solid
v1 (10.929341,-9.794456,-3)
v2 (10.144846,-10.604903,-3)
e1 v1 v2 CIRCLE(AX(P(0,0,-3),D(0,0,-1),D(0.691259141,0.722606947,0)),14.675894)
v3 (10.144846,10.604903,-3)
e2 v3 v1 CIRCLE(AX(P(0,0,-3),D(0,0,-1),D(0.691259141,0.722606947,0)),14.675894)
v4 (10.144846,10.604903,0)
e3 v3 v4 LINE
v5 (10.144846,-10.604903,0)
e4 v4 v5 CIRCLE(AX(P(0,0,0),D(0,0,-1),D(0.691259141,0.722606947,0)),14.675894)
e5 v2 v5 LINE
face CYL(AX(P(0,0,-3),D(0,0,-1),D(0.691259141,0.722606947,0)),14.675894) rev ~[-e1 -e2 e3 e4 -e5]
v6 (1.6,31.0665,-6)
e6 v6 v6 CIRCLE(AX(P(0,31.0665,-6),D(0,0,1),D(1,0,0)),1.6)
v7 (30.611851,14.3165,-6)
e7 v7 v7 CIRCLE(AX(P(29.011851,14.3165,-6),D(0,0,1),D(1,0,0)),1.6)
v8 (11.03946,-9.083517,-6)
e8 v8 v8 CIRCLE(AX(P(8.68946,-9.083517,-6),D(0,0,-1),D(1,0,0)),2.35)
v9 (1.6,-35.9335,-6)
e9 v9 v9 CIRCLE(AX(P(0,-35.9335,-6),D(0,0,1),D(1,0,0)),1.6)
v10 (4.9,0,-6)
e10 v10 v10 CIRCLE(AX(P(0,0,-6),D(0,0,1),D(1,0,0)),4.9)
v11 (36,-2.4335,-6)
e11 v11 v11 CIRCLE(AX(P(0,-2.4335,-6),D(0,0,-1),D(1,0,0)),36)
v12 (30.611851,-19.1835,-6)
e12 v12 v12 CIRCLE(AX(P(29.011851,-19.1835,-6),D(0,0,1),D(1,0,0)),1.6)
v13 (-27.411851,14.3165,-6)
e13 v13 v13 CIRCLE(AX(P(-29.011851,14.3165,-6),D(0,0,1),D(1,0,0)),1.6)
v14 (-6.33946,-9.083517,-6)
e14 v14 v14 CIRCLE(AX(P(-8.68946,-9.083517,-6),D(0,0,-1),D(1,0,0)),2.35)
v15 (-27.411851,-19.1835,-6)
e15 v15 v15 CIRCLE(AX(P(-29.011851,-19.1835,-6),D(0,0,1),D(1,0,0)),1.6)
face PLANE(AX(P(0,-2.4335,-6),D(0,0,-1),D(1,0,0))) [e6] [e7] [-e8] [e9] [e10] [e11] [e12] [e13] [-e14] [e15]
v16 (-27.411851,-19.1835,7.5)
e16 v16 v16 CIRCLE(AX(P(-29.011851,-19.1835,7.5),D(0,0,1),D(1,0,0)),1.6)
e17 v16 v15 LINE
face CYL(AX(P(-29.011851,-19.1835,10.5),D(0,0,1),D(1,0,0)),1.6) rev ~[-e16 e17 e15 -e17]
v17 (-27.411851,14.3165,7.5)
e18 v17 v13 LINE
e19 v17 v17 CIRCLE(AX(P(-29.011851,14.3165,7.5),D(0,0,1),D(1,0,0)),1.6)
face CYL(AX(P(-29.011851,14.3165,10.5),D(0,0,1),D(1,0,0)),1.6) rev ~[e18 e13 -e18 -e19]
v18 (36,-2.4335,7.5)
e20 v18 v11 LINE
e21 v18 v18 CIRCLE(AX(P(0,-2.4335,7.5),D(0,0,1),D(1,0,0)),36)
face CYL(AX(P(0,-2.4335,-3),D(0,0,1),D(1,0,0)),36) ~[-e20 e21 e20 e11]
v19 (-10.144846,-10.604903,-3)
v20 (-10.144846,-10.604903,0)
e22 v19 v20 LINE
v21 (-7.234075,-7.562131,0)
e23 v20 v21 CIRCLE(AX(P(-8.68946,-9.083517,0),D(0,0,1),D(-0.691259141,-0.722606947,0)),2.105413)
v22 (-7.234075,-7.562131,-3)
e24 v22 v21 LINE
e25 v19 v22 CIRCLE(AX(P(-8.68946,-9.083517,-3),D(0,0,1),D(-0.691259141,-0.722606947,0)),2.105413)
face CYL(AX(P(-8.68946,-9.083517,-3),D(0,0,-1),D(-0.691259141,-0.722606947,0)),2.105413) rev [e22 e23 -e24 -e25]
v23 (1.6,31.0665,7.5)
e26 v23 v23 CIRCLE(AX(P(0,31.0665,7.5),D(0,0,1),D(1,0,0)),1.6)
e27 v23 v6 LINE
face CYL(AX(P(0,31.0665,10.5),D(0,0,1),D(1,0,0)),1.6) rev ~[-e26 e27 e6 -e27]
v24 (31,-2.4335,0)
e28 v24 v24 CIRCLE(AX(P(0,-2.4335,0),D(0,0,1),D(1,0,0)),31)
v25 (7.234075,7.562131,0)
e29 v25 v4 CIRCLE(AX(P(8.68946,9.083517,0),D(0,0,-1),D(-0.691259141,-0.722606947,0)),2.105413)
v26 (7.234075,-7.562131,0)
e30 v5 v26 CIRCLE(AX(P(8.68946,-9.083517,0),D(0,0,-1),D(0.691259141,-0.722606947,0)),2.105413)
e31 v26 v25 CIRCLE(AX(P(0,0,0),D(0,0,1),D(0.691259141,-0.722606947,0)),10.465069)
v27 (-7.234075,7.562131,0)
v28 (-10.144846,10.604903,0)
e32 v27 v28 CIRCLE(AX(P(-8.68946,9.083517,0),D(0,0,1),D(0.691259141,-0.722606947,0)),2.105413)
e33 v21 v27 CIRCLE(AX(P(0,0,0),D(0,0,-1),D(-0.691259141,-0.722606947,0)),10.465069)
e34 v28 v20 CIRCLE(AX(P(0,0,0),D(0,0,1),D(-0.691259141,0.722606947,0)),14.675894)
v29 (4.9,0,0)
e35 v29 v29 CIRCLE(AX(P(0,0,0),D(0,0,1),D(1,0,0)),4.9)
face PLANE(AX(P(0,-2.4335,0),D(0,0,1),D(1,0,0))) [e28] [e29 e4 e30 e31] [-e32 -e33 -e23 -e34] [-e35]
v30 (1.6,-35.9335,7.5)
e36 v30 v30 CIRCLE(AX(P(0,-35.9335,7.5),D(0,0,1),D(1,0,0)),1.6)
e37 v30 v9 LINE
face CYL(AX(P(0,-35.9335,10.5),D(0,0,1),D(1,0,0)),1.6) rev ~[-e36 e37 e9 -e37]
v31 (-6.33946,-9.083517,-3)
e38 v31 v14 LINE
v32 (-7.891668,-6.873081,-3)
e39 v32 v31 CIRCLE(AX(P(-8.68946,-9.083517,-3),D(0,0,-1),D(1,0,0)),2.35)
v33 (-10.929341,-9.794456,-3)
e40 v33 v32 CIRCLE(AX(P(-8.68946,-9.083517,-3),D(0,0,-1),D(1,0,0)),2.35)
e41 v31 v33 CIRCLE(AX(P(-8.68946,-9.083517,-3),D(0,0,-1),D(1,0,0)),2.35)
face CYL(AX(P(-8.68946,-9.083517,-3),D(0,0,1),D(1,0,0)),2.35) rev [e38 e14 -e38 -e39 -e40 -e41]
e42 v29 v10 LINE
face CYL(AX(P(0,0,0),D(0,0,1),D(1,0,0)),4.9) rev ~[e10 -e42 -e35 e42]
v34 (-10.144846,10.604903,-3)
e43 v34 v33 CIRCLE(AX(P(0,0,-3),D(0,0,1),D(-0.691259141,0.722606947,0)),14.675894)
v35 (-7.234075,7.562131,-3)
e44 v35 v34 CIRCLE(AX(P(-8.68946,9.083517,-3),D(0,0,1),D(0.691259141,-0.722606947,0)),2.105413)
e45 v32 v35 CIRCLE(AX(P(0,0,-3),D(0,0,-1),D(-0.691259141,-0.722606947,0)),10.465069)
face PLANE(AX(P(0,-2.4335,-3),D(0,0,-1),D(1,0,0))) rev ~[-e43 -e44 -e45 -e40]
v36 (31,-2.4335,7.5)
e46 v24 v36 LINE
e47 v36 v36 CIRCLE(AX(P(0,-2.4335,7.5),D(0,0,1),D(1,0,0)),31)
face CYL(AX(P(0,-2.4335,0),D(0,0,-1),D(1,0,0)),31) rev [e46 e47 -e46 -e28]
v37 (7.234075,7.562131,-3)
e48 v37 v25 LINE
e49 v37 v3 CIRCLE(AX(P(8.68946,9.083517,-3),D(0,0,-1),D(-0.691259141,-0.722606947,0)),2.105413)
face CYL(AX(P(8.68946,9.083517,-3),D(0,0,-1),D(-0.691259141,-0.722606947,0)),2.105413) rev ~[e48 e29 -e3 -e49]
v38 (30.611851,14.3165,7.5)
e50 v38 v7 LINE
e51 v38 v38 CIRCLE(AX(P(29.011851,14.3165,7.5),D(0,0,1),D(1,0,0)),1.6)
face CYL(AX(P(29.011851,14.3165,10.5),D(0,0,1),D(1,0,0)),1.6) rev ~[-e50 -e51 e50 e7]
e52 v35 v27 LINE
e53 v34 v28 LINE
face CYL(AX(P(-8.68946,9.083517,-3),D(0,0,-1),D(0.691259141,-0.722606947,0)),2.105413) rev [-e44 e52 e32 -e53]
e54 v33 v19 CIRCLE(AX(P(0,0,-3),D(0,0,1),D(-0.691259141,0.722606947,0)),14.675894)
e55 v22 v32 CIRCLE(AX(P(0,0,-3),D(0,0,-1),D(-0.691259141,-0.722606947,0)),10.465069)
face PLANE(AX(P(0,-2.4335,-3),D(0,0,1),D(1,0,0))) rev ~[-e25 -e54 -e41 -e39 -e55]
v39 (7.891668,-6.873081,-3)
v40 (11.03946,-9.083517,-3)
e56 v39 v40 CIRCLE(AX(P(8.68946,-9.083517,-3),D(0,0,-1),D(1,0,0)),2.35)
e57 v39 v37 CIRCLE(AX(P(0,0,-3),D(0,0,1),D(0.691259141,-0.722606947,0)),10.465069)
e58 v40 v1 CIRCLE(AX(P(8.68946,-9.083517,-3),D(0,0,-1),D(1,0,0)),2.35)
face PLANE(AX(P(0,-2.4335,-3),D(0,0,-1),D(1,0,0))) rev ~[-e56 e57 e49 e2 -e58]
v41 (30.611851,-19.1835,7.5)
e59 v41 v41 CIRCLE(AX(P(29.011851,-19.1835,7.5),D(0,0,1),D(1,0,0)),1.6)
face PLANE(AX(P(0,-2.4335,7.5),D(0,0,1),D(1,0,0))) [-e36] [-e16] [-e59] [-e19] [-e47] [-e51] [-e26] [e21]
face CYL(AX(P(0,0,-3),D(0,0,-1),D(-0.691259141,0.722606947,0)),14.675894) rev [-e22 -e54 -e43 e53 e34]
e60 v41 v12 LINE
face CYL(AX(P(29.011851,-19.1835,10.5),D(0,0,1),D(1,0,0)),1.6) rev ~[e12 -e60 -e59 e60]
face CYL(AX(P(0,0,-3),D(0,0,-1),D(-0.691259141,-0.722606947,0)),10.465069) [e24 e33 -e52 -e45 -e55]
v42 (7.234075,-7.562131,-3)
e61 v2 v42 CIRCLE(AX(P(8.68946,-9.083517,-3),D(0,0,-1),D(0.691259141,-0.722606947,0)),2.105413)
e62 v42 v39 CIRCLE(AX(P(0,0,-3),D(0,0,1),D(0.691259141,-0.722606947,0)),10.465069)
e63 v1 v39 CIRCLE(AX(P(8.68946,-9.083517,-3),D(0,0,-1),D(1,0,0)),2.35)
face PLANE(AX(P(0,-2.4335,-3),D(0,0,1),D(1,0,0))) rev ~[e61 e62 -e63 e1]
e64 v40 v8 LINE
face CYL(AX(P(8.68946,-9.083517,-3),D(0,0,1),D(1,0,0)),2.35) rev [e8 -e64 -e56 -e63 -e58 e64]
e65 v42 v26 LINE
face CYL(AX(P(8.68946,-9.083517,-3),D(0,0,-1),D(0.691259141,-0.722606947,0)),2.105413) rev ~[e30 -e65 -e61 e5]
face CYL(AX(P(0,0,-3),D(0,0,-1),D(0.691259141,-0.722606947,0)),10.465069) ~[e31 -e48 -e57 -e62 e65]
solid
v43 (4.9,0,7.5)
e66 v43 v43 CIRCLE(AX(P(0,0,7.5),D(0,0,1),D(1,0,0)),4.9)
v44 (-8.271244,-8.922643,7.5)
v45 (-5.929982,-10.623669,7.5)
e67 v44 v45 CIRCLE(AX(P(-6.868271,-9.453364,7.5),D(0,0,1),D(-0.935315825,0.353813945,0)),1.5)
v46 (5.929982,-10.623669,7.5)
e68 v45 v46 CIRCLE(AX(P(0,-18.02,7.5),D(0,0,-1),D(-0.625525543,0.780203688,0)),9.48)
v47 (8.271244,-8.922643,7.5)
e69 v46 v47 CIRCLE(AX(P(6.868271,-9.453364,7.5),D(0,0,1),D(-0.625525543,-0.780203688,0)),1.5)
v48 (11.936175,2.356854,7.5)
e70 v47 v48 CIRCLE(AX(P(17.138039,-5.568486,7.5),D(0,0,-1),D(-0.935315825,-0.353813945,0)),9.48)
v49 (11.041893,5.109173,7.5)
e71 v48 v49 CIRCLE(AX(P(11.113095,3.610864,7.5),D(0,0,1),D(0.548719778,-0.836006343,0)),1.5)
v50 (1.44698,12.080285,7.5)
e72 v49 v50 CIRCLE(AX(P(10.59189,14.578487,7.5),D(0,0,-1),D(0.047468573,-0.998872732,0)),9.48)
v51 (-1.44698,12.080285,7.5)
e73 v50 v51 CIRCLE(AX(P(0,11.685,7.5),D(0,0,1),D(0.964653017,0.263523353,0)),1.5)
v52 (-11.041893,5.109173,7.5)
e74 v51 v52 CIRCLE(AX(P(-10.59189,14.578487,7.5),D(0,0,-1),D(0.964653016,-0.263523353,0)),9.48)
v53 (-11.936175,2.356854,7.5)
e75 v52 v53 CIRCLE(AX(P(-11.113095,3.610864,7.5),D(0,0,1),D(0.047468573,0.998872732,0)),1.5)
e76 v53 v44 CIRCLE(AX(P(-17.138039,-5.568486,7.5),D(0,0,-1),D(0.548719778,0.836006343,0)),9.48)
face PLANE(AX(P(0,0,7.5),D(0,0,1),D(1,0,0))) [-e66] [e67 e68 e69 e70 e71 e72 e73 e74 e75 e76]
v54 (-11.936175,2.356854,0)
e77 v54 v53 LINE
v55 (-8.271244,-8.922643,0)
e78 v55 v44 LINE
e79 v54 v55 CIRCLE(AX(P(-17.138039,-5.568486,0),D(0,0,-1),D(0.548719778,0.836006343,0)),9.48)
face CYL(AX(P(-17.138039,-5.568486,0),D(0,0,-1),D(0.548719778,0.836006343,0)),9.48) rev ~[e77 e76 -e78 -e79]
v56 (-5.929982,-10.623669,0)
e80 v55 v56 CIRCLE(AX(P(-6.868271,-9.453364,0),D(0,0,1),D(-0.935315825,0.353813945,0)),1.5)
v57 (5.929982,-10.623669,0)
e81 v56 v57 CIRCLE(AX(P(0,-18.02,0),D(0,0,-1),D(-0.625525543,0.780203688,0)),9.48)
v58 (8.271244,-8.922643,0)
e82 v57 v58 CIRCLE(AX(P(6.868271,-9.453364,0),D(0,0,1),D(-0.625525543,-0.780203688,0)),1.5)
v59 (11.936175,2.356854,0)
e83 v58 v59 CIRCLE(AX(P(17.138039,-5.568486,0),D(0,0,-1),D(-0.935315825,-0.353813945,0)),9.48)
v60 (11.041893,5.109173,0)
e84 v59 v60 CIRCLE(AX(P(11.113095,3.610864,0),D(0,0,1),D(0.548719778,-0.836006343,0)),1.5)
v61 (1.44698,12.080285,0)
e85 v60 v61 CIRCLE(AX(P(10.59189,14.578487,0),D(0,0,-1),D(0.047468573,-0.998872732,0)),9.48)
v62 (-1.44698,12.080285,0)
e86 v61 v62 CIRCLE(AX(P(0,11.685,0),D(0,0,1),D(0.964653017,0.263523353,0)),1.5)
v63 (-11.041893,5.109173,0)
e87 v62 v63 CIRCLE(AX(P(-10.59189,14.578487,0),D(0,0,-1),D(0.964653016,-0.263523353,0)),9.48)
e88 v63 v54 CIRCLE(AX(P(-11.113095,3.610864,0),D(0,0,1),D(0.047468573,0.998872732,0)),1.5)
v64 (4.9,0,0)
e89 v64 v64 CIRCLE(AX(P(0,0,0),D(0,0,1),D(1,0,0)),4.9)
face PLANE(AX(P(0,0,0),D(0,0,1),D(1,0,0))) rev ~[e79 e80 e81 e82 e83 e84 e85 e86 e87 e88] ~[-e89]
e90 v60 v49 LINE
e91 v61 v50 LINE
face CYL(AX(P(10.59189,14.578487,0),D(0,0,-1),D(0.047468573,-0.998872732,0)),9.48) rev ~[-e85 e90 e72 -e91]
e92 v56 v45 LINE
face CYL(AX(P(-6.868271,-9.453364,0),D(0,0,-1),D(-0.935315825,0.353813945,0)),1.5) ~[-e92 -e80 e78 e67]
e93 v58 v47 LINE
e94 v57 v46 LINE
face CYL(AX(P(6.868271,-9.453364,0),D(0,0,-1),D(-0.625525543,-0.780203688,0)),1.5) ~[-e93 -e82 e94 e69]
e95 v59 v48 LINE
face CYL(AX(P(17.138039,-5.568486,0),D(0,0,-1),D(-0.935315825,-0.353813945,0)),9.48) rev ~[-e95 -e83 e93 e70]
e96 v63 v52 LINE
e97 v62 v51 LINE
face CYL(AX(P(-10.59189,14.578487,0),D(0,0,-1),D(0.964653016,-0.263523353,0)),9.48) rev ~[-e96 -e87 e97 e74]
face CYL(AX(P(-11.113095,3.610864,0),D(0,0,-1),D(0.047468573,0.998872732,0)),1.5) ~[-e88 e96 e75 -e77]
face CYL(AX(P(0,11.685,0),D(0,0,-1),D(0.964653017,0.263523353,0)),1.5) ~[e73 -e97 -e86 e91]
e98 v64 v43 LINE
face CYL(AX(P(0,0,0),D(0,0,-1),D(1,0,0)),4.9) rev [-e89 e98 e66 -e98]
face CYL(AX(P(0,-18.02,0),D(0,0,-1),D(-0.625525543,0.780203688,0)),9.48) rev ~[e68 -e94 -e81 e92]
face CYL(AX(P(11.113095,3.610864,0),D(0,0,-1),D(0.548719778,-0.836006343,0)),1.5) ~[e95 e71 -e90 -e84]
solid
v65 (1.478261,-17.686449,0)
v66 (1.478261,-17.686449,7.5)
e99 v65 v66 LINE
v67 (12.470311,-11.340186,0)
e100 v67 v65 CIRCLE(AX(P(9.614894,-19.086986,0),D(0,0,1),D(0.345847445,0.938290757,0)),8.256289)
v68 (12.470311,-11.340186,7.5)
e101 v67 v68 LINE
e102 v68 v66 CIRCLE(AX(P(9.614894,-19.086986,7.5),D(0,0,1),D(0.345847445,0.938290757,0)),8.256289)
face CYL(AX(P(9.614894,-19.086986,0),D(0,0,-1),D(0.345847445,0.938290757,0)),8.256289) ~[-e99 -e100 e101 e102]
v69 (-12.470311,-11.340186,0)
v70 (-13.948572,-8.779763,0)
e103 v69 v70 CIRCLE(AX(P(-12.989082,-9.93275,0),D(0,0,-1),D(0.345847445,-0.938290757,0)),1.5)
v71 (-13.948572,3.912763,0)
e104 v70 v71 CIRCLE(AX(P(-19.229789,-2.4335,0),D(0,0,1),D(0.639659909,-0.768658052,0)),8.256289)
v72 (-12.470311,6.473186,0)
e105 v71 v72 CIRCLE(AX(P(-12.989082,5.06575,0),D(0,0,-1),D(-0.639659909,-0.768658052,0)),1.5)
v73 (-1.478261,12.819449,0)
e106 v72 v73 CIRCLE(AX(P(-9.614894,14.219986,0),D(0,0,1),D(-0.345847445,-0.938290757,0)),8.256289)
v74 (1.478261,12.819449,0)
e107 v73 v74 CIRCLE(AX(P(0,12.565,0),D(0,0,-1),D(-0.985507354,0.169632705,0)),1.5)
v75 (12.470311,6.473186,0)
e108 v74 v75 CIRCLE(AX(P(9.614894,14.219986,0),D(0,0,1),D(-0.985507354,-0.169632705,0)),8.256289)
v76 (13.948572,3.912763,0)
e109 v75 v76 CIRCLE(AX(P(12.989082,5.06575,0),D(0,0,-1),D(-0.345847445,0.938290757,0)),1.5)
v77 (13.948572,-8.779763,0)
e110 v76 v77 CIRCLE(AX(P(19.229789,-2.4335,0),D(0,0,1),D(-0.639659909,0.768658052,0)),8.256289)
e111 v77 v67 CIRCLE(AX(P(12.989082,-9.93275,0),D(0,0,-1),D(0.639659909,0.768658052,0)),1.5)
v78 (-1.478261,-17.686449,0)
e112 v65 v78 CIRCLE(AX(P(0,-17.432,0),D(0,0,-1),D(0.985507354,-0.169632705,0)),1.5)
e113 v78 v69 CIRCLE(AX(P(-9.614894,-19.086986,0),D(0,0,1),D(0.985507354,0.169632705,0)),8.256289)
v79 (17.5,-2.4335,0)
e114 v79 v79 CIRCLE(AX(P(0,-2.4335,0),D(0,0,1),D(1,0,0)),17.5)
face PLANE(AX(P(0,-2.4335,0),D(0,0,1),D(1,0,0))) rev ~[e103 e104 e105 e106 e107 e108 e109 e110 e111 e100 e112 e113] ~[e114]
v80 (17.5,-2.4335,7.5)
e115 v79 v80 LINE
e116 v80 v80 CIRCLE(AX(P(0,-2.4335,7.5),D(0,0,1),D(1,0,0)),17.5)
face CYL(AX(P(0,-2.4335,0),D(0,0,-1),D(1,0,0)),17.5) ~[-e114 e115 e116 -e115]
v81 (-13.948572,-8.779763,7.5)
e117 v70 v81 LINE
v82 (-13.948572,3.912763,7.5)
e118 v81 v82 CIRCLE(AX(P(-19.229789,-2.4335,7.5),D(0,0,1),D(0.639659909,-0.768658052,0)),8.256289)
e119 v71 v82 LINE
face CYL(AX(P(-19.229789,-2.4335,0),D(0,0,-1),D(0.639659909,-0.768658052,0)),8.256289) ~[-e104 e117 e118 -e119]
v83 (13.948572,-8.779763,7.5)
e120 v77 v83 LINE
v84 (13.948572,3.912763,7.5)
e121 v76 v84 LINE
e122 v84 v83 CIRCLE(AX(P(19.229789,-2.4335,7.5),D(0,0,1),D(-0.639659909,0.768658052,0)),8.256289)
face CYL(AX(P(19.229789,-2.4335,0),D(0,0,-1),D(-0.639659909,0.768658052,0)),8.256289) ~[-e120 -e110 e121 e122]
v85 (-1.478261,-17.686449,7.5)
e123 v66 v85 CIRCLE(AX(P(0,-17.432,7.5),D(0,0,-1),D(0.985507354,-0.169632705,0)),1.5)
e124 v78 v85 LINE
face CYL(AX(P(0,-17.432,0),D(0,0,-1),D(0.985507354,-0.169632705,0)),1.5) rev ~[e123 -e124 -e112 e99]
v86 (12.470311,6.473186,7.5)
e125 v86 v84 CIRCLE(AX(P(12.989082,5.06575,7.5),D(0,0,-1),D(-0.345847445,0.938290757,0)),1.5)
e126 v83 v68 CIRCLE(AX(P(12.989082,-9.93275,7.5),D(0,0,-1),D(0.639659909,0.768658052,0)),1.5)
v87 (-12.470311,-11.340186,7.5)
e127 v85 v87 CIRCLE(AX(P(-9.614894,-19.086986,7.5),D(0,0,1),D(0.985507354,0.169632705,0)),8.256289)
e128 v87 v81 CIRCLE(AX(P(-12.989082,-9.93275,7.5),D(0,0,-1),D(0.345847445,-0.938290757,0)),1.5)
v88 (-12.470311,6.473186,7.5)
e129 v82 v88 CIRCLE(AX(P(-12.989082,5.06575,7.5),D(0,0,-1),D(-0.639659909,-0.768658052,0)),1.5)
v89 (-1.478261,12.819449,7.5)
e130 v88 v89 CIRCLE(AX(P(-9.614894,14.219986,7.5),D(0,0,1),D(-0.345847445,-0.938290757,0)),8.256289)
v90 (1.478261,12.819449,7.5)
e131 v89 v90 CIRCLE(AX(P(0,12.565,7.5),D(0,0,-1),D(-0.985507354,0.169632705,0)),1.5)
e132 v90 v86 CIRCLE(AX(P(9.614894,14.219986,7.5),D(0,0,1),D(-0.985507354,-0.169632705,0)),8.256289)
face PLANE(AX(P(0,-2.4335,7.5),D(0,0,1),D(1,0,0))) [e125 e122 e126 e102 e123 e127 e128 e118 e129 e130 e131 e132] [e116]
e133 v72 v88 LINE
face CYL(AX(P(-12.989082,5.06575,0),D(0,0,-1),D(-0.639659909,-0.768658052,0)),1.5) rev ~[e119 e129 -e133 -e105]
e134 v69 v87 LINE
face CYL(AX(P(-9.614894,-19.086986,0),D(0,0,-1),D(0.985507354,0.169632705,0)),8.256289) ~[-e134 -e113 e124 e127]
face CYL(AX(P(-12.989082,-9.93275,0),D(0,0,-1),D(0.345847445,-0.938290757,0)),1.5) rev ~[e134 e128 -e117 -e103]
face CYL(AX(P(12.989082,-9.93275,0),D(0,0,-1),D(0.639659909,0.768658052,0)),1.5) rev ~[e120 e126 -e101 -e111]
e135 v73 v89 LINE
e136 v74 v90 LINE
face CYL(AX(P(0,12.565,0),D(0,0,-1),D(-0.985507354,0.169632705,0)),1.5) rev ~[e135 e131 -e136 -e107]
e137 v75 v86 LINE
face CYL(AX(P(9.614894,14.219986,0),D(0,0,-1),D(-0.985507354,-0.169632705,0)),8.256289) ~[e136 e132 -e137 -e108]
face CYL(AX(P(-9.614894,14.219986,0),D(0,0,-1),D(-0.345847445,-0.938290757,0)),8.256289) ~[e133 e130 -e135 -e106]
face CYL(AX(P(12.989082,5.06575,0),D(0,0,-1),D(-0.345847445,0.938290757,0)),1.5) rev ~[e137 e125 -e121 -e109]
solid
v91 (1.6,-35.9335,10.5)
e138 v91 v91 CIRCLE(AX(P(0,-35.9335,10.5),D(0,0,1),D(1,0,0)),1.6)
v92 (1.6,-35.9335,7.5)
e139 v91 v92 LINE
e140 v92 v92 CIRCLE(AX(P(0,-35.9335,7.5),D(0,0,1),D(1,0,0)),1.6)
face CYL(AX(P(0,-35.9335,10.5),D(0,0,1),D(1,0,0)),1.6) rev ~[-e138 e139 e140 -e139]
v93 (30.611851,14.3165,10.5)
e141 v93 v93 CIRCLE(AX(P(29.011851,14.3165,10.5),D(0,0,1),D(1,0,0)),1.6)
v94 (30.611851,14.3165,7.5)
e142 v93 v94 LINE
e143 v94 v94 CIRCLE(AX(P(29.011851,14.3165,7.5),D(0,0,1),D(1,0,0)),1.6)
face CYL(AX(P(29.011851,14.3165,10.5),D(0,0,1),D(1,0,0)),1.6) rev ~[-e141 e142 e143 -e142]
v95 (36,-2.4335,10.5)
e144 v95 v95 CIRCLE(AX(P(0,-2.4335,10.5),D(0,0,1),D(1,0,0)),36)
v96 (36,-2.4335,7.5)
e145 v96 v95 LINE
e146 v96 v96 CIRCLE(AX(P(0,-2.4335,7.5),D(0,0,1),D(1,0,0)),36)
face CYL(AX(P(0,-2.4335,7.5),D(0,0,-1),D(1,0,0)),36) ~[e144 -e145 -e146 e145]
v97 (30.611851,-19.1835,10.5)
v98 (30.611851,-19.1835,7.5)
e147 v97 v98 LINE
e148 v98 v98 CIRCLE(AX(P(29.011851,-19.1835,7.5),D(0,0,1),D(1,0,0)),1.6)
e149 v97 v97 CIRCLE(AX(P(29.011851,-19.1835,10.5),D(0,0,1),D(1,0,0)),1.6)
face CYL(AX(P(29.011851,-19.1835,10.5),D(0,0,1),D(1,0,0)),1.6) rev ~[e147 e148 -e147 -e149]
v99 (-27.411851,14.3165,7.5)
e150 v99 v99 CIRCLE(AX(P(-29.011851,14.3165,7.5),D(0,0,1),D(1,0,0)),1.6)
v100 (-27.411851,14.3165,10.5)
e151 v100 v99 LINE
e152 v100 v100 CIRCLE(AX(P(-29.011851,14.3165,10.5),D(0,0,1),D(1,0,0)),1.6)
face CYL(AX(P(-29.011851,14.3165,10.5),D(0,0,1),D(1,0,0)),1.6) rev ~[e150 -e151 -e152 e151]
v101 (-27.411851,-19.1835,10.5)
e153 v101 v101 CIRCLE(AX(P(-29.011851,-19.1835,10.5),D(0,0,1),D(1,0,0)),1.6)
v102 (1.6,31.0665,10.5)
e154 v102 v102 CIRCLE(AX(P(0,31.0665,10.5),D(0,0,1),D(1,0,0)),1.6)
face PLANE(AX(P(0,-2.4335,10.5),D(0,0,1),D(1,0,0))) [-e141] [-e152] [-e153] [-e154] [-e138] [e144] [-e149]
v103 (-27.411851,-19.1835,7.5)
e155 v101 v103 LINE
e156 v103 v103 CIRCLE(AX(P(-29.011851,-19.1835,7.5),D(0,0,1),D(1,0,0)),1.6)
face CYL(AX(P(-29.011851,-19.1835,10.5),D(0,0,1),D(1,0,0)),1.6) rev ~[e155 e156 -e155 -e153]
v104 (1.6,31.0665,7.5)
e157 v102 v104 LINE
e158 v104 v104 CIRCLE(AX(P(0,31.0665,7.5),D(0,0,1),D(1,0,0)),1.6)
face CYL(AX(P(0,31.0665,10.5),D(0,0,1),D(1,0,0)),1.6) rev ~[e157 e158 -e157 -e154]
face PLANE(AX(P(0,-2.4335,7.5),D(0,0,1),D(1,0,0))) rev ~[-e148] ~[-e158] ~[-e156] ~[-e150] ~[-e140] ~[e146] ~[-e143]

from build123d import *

# Parameters (mm, degrees)
F0_R      = 4.9
F1_DEPTH  = 7.5
F2_R      = 17.5
F3_DEPTH  = 7.5
F4_R      = 36
F4_R_2    = 31
F4_R_3    = 4.9
F5_DEPTH  = 3
F6_DEPTH  = 7.5
F7_R      = 36
F7_R_2    = 31
F8_DEPTH  = 3
F10_DEPTH = 3
F11_R     = 36
F11_R_2   = 2.35
F12_DEPTH = 3
F13_R     = 1.6
F14_DEPTH = 25
F15_DEPTH = 25


# Not quite as in the source:
# - a pattern or mirror of a feature is missing from the dataset's text; its kind, count and spacing are read off the source's solid


with BuildPart() as f1:
    # F0 (on Top) → F1 (new body)
    with BuildSketch(Plane.XY):
        with BuildLine():
            ThreePointArc((11.0418925329, 5.1091726771), (5.0196860546, 6.909005132), (1.4469795247, 12.08028503))
            ThreePointArc((1.4469795247, 12.08028503), (0, 13.185), (-1.4469795247, 12.08028503))
            ThreePointArc((-1.4469795247, 12.08028503), (-5.0196860546, 6.909005132), (-11.0418925329, 5.1091726771))
            ThreePointArc((-11.0418925329, 5.1091726771), (-12.5396801674, 4.0743890708), (-11.9361750602, 2.3568540652))
            ThreePointArc((-11.9361750602, 2.3568540652), (-8.1220226492, -2.639005132), (-8.2712444102, -8.9226426612))
            ThreePointArc((-8.2712444102, -8.9226426612), (-7.7499485515, -10.6668890708), (-5.9299823581, -10.6236691112))
            ThreePointArc((-5.9299823581, -10.6236691112), (0, -8.54), (5.9299823581, -10.6236691112))
            ThreePointArc((5.9299823581, -10.6236691112), (7.7499485515, -10.6668890708), (8.2712444102, -8.9226426612))
            ThreePointArc((8.2712444102, -8.9226426612), (8.1220226492, -2.639005132), (11.9361750602, 2.3568540652))
            ThreePointArc((11.9361750602, 2.3568540652), (12.5396801674, 4.0743890708), (11.0418925329, 5.1091726771))
        make_face()
        Circle(F0_R, mode=Mode.SUBTRACT)
    extrude(amount=F1_DEPTH)


with BuildPart() as f3:
    # F2 (on Top) → F3 (new body)
    with BuildSketch(Plane.XY):
        with Locations((0, -2.4335)):
            Circle(F2_R)
        with BuildLine():
            ThreePointArc((-1.4782610314, 12.8194490581), (0, 14.065), (1.4782610314, 12.8194490581))
            ThreePointArc((1.4782610314, 12.8194490581), (5.48675, 7.0698297684), (12.4703108513, 6.4731861356))
            ThreePointArc((12.4703108513, 6.4731861356), (14.2881201243, 5.81575), (13.9485718827, 3.9127629225))
            ThreePointArc((13.9485718827, 3.9127629225), (10.9735, -2.4335), (13.9485718827, -8.7797629225))
            ThreePointArc((13.9485718827, -8.7797629225), (14.2881201243, -10.68275), (12.4703108513, -11.3401861356))
            ThreePointArc((12.4703108513, -11.3401861356), (5.48675, -11.9368297684), (1.4782610314, -17.6864490581))
            ThreePointArc((1.4782610314, -17.6864490581), (0, -18.932), (-1.4782610314, -17.6864490581))
            ThreePointArc((-1.4782610314, -17.6864490581), (-5.48675, -11.9368297684), (-12.4703108513, -11.3401861356))
            ThreePointArc((-12.4703108513, -11.3401861356), (-14.2881201243, -10.68275), (-13.9485718827, -8.7797629225))
            ThreePointArc((-13.9485718827, -8.7797629225), (-10.9735, -2.4335), (-13.9485718827, 3.9127629225))
            ThreePointArc((-13.9485718827, 3.9127629225), (-14.2881201243, 5.81575), (-12.4703108513, 6.4731861356))
            ThreePointArc((-12.4703108513, 6.4731861356), (-5.48675, 7.0698297684), (-1.4782610314, 12.8194490581))
        make_face(mode=Mode.SUBTRACT)
    extrude(amount=F3_DEPTH)


with BuildPart() as f5:
    # F4 (on Top) → F5 (new body)
    with BuildSketch(Plane.XY):
        with Locations((0, -2.4335)):
            Circle(F4_R)
        with Locations((0, -2.4335)):
            Circle(F4_R_2, mode=Mode.SUBTRACT)
        with Locations((0, -2.4335)):
            Circle(F4_R_2)
        Circle(F4_R_3, mode=Mode.SUBTRACT)
    extrude(amount=-F5_DEPTH)

    # F4 (on Top) → F6 (join)
    with BuildSketch(Plane.XY):
        with Locations((0, -2.4335)):
            Circle(F4_R)
        with Locations((0, -2.4335)):
            Circle(F4_R_2, mode=Mode.SUBTRACT)
    extrude(amount=F6_DEPTH)

    # F9 (on face) → F10 (cut, through all)
    with BuildSketch(Plane(origin=(0, 0, -3), x_dir=(1, 0, 0), z_dir=(0, 0, -1))):
        with BuildLine():
            ThreePointArc((10.1448459521, 10.6049030387), (7.1680744716, 10.5389029721), (7.2340745381, 7.5621314916))
            ThreePointArc((7.2340745381, 7.5621314916), (10.4650689018, 0), (7.2340745381, -7.5621314916))
            ThreePointArc((7.2340745381, -7.5621314916), (7.1680744716, -10.5389029721), (10.1448459521, -10.6049030387))
            ThreePointArc((10.1448459521, -10.6049030387), (14.6758941074, 0), (10.1448459521, 10.6049030387))
        make_face()
    f10 = extrude(amount=-F10_DEPTH, mode=Mode.SUBTRACT)

    # F10_copies: F10 across plane
    add(f10.mirror(Plane(origin=(0, 0, 0), x_dir=(0, 0, -1), z_dir=(-1, 0, 0))), mode=Mode.SUBTRACT)

    # F11 (on face) → F12 (join)
    with BuildSketch(Plane(origin=(0, 0, -3), x_dir=(1, 0, 0), z_dir=(0, 0, -1))):
        with Locations((0, 2.4335)):
            Circle(F11_R)
        with Locations((-8.6894602451, 9.0835172651)):
            Circle(F11_R_2, mode=Mode.SUBTRACT)
        with Locations((8.6894602451, 9.0835172651)):
            Circle(F11_R_2, mode=Mode.SUBTRACT)
    extrude(amount=F12_DEPTH)


with BuildPart() as f8:
    # F7 (on face) → F8 (new body)
    with BuildSketch(Plane.XY.offset(7.5)):
        with Locations((0, -2.4335)):
            Circle(F7_R)
        with Locations((0, -2.4335)):
            Circle(F7_R_2, mode=Mode.SUBTRACT)
        with Locations((0, -2.4335)):
            Circle(F7_R_2)
    extrude(amount=F8_DEPTH)


with BuildPart() as f14_tool:
    # F13 (on face) → F14 (new body)
    with BuildSketch(Plane.XY.offset(10.5)):
        with Locations((0, 31.0665)):
            Circle(F13_R)
        with Locations((-29.0118510268, 14.3165)):
            Circle(F13_R)
        with Locations((-29.0118510268, -19.1835)):
            Circle(F13_R)
        with Locations((0, -35.9335)):
            Circle(F13_R)
        with Locations((29.0118510268, -19.1835)):
            Circle(F13_R)
        with Locations((29.0118510268, 14.3165)):
            Circle(F13_R)
    extrude(amount=-F14_DEPTH)


with BuildPart() as f5_1:
    add(f5.part)

    # F14: cut by f14_tool
    add(f14_tool.part, mode=Mode.SUBTRACT)

    # F0 (on Top) → F15 (cut)
    with BuildSketch(Plane.XY):
        Circle(F0_R)
    extrude(amount=-F15_DEPTH, mode=Mode.SUBTRACT)


with BuildPart() as f8_1:
    add(f8.part)

    # F14: cut by f14_tool
    add(f14_tool.part, mode=Mode.SUBTRACT)


solid = Compound([f1.part, f3.part, f5_1.part, f8_1.part])
